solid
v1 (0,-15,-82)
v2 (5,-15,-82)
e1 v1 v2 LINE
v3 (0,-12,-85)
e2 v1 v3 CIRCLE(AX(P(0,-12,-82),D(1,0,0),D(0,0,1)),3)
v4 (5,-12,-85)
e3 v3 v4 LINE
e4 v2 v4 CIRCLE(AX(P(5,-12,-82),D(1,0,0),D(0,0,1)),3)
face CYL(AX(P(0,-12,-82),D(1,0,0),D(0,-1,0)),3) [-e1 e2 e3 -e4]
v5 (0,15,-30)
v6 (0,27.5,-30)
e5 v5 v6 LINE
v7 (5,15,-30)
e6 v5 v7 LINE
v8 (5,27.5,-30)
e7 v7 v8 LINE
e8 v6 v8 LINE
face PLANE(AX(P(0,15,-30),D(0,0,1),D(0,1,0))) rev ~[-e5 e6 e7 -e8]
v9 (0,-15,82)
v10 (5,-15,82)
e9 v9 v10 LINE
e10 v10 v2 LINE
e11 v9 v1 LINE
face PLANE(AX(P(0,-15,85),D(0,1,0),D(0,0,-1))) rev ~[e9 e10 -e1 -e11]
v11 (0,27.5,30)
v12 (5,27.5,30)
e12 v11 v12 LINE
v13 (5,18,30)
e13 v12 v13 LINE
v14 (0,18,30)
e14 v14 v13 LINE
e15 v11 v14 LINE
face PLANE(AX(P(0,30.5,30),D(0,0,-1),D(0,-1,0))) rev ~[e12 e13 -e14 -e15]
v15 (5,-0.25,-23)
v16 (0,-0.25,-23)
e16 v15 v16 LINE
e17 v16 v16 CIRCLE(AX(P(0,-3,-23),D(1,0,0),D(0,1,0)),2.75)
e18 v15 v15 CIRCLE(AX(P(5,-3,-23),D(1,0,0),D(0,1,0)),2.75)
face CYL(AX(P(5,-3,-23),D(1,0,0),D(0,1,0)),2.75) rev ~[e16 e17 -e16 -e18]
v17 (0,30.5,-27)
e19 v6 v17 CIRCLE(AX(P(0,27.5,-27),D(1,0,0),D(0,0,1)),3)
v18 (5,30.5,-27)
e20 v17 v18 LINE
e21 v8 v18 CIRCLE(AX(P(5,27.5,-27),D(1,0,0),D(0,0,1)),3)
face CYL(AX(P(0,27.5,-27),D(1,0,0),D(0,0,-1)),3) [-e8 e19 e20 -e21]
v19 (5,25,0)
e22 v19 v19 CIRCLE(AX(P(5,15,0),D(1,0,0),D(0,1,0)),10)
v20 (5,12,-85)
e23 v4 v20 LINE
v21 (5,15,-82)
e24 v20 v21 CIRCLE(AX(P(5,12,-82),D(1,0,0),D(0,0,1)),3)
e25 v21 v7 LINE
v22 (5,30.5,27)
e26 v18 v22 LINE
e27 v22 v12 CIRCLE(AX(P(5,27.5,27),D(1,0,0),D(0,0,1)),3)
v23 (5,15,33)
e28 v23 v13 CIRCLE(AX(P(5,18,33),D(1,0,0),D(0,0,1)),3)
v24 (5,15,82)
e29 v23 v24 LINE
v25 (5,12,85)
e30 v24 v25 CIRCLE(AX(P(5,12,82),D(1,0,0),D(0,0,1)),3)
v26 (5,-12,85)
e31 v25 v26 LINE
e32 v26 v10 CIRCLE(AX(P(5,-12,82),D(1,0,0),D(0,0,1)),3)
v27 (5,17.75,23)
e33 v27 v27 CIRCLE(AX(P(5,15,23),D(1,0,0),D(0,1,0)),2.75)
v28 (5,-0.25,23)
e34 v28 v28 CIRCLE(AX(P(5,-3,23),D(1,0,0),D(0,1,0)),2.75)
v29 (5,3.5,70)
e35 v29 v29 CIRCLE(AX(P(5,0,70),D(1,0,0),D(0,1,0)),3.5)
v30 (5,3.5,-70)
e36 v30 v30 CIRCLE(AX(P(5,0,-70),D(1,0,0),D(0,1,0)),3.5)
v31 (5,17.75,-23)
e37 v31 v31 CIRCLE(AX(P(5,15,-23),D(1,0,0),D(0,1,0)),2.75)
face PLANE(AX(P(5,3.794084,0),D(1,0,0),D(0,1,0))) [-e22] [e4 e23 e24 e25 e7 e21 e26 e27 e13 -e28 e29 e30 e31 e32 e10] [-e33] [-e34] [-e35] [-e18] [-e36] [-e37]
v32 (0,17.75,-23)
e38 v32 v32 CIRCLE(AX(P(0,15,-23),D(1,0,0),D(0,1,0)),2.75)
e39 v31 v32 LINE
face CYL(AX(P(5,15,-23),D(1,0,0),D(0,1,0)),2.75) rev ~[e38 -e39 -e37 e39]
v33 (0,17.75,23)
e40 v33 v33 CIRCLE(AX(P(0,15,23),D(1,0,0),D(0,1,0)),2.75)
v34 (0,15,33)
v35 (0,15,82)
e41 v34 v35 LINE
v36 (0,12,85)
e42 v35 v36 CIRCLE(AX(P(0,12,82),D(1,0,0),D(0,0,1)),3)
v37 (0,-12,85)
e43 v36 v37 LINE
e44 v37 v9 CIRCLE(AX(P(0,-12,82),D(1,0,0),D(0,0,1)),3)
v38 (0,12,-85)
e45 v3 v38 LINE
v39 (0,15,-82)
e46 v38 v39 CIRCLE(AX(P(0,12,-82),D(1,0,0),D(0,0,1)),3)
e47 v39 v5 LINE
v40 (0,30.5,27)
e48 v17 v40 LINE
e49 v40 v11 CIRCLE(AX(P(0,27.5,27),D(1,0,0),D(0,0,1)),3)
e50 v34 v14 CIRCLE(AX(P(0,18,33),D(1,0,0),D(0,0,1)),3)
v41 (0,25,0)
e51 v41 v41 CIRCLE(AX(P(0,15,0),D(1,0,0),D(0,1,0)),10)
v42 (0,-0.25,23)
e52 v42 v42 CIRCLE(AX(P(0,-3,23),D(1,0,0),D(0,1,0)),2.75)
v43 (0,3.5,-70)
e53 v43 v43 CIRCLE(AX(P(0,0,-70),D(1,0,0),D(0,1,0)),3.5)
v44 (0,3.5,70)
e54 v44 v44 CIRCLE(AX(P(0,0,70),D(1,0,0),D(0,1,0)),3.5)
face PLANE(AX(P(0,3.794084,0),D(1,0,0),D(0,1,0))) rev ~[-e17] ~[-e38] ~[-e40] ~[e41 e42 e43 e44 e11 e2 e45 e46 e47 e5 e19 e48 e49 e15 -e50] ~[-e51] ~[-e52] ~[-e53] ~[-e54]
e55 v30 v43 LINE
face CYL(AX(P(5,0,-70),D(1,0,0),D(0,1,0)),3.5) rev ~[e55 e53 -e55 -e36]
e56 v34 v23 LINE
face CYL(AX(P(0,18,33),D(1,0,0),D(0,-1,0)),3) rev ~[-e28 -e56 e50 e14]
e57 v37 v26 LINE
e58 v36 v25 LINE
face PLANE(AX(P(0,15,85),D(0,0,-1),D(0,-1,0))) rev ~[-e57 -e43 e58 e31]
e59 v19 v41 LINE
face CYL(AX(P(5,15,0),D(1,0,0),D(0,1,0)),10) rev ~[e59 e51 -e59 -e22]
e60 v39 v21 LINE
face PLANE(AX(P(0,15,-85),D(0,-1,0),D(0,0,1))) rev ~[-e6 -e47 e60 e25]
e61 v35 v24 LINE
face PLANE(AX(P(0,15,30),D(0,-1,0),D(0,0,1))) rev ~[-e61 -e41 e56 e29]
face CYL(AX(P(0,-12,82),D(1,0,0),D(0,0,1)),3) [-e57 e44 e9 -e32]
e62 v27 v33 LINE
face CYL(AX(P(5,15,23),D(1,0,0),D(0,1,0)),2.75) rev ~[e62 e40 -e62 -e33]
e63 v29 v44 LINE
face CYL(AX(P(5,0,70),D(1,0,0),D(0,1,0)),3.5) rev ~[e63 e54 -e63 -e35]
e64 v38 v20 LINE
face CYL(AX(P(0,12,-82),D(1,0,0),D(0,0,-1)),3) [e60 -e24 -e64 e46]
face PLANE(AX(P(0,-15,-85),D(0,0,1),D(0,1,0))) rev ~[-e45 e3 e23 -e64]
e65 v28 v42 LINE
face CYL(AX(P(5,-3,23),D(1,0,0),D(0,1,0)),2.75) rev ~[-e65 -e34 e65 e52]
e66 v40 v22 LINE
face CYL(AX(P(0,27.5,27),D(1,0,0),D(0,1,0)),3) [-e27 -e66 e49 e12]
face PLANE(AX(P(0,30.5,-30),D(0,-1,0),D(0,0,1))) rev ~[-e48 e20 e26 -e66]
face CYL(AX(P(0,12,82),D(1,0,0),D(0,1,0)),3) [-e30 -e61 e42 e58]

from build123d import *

# Parameters (mm, degrees)
F1_DEPTH = 5
F2_R     = 3
F3_R     = 3.5
F4_DEPTH = 5
F6_R     = 10
F6_R_2   = 2.75
F7_DEPTH = 5


# Not quite as in the source:
# - two fillets or chamfers of one size are made in one step


with BuildPart() as f1:
    # F0 (on Right) → F1 (new body)
    with BuildSketch(Plane.YZ):
        Polygon((15, 30), (15, 85), (-15, 85), (-15, -85), (15, -85), (15, -30), (30.5, -30), (30.5, 30), align=None)
    extrude(amount=F1_DEPTH)

    # F2
    f2_edges = [f1.edges().sort_by_distance(p)[0] for p in [
        (2.5, -15, 85),
        (2.5, 15, 85),
        (2.5, -15, -85),
        (2.5, 15, 30),
        (2.5, 15, -85),
        (2.5, 30.5, -30),
        (2.5, 30.5, 30),
    ]]
    fillet(f2_edges, radius=F2_R)

    # F3 (on face) → F4 (cut)
    with BuildSketch(Plane.YZ.offset(5)):
        with Locations((0, 70)):
            Circle(F3_R)
        with Locations((0, -70)):
            Circle(F3_R)
    extrude(amount=-F4_DEPTH, mode=Mode.SUBTRACT)

    # F6 (on face) → F7 (cut)
    with BuildSketch(Plane.YZ.offset(5)):
        with Locations((15, 0)):
            Circle(F6_R)
        with Locations((15, 23)):
            Circle(F6_R_2)
        with Locations((15, -23)):
            Circle(F6_R_2)
        with Locations((-3, -23)):
            Circle(F6_R_2)
        with Locations((-3, 23)):
            Circle(F6_R_2)
    extrude(amount=-F7_DEPTH, mode=Mode.SUBTRACT)


solid = f1.part
